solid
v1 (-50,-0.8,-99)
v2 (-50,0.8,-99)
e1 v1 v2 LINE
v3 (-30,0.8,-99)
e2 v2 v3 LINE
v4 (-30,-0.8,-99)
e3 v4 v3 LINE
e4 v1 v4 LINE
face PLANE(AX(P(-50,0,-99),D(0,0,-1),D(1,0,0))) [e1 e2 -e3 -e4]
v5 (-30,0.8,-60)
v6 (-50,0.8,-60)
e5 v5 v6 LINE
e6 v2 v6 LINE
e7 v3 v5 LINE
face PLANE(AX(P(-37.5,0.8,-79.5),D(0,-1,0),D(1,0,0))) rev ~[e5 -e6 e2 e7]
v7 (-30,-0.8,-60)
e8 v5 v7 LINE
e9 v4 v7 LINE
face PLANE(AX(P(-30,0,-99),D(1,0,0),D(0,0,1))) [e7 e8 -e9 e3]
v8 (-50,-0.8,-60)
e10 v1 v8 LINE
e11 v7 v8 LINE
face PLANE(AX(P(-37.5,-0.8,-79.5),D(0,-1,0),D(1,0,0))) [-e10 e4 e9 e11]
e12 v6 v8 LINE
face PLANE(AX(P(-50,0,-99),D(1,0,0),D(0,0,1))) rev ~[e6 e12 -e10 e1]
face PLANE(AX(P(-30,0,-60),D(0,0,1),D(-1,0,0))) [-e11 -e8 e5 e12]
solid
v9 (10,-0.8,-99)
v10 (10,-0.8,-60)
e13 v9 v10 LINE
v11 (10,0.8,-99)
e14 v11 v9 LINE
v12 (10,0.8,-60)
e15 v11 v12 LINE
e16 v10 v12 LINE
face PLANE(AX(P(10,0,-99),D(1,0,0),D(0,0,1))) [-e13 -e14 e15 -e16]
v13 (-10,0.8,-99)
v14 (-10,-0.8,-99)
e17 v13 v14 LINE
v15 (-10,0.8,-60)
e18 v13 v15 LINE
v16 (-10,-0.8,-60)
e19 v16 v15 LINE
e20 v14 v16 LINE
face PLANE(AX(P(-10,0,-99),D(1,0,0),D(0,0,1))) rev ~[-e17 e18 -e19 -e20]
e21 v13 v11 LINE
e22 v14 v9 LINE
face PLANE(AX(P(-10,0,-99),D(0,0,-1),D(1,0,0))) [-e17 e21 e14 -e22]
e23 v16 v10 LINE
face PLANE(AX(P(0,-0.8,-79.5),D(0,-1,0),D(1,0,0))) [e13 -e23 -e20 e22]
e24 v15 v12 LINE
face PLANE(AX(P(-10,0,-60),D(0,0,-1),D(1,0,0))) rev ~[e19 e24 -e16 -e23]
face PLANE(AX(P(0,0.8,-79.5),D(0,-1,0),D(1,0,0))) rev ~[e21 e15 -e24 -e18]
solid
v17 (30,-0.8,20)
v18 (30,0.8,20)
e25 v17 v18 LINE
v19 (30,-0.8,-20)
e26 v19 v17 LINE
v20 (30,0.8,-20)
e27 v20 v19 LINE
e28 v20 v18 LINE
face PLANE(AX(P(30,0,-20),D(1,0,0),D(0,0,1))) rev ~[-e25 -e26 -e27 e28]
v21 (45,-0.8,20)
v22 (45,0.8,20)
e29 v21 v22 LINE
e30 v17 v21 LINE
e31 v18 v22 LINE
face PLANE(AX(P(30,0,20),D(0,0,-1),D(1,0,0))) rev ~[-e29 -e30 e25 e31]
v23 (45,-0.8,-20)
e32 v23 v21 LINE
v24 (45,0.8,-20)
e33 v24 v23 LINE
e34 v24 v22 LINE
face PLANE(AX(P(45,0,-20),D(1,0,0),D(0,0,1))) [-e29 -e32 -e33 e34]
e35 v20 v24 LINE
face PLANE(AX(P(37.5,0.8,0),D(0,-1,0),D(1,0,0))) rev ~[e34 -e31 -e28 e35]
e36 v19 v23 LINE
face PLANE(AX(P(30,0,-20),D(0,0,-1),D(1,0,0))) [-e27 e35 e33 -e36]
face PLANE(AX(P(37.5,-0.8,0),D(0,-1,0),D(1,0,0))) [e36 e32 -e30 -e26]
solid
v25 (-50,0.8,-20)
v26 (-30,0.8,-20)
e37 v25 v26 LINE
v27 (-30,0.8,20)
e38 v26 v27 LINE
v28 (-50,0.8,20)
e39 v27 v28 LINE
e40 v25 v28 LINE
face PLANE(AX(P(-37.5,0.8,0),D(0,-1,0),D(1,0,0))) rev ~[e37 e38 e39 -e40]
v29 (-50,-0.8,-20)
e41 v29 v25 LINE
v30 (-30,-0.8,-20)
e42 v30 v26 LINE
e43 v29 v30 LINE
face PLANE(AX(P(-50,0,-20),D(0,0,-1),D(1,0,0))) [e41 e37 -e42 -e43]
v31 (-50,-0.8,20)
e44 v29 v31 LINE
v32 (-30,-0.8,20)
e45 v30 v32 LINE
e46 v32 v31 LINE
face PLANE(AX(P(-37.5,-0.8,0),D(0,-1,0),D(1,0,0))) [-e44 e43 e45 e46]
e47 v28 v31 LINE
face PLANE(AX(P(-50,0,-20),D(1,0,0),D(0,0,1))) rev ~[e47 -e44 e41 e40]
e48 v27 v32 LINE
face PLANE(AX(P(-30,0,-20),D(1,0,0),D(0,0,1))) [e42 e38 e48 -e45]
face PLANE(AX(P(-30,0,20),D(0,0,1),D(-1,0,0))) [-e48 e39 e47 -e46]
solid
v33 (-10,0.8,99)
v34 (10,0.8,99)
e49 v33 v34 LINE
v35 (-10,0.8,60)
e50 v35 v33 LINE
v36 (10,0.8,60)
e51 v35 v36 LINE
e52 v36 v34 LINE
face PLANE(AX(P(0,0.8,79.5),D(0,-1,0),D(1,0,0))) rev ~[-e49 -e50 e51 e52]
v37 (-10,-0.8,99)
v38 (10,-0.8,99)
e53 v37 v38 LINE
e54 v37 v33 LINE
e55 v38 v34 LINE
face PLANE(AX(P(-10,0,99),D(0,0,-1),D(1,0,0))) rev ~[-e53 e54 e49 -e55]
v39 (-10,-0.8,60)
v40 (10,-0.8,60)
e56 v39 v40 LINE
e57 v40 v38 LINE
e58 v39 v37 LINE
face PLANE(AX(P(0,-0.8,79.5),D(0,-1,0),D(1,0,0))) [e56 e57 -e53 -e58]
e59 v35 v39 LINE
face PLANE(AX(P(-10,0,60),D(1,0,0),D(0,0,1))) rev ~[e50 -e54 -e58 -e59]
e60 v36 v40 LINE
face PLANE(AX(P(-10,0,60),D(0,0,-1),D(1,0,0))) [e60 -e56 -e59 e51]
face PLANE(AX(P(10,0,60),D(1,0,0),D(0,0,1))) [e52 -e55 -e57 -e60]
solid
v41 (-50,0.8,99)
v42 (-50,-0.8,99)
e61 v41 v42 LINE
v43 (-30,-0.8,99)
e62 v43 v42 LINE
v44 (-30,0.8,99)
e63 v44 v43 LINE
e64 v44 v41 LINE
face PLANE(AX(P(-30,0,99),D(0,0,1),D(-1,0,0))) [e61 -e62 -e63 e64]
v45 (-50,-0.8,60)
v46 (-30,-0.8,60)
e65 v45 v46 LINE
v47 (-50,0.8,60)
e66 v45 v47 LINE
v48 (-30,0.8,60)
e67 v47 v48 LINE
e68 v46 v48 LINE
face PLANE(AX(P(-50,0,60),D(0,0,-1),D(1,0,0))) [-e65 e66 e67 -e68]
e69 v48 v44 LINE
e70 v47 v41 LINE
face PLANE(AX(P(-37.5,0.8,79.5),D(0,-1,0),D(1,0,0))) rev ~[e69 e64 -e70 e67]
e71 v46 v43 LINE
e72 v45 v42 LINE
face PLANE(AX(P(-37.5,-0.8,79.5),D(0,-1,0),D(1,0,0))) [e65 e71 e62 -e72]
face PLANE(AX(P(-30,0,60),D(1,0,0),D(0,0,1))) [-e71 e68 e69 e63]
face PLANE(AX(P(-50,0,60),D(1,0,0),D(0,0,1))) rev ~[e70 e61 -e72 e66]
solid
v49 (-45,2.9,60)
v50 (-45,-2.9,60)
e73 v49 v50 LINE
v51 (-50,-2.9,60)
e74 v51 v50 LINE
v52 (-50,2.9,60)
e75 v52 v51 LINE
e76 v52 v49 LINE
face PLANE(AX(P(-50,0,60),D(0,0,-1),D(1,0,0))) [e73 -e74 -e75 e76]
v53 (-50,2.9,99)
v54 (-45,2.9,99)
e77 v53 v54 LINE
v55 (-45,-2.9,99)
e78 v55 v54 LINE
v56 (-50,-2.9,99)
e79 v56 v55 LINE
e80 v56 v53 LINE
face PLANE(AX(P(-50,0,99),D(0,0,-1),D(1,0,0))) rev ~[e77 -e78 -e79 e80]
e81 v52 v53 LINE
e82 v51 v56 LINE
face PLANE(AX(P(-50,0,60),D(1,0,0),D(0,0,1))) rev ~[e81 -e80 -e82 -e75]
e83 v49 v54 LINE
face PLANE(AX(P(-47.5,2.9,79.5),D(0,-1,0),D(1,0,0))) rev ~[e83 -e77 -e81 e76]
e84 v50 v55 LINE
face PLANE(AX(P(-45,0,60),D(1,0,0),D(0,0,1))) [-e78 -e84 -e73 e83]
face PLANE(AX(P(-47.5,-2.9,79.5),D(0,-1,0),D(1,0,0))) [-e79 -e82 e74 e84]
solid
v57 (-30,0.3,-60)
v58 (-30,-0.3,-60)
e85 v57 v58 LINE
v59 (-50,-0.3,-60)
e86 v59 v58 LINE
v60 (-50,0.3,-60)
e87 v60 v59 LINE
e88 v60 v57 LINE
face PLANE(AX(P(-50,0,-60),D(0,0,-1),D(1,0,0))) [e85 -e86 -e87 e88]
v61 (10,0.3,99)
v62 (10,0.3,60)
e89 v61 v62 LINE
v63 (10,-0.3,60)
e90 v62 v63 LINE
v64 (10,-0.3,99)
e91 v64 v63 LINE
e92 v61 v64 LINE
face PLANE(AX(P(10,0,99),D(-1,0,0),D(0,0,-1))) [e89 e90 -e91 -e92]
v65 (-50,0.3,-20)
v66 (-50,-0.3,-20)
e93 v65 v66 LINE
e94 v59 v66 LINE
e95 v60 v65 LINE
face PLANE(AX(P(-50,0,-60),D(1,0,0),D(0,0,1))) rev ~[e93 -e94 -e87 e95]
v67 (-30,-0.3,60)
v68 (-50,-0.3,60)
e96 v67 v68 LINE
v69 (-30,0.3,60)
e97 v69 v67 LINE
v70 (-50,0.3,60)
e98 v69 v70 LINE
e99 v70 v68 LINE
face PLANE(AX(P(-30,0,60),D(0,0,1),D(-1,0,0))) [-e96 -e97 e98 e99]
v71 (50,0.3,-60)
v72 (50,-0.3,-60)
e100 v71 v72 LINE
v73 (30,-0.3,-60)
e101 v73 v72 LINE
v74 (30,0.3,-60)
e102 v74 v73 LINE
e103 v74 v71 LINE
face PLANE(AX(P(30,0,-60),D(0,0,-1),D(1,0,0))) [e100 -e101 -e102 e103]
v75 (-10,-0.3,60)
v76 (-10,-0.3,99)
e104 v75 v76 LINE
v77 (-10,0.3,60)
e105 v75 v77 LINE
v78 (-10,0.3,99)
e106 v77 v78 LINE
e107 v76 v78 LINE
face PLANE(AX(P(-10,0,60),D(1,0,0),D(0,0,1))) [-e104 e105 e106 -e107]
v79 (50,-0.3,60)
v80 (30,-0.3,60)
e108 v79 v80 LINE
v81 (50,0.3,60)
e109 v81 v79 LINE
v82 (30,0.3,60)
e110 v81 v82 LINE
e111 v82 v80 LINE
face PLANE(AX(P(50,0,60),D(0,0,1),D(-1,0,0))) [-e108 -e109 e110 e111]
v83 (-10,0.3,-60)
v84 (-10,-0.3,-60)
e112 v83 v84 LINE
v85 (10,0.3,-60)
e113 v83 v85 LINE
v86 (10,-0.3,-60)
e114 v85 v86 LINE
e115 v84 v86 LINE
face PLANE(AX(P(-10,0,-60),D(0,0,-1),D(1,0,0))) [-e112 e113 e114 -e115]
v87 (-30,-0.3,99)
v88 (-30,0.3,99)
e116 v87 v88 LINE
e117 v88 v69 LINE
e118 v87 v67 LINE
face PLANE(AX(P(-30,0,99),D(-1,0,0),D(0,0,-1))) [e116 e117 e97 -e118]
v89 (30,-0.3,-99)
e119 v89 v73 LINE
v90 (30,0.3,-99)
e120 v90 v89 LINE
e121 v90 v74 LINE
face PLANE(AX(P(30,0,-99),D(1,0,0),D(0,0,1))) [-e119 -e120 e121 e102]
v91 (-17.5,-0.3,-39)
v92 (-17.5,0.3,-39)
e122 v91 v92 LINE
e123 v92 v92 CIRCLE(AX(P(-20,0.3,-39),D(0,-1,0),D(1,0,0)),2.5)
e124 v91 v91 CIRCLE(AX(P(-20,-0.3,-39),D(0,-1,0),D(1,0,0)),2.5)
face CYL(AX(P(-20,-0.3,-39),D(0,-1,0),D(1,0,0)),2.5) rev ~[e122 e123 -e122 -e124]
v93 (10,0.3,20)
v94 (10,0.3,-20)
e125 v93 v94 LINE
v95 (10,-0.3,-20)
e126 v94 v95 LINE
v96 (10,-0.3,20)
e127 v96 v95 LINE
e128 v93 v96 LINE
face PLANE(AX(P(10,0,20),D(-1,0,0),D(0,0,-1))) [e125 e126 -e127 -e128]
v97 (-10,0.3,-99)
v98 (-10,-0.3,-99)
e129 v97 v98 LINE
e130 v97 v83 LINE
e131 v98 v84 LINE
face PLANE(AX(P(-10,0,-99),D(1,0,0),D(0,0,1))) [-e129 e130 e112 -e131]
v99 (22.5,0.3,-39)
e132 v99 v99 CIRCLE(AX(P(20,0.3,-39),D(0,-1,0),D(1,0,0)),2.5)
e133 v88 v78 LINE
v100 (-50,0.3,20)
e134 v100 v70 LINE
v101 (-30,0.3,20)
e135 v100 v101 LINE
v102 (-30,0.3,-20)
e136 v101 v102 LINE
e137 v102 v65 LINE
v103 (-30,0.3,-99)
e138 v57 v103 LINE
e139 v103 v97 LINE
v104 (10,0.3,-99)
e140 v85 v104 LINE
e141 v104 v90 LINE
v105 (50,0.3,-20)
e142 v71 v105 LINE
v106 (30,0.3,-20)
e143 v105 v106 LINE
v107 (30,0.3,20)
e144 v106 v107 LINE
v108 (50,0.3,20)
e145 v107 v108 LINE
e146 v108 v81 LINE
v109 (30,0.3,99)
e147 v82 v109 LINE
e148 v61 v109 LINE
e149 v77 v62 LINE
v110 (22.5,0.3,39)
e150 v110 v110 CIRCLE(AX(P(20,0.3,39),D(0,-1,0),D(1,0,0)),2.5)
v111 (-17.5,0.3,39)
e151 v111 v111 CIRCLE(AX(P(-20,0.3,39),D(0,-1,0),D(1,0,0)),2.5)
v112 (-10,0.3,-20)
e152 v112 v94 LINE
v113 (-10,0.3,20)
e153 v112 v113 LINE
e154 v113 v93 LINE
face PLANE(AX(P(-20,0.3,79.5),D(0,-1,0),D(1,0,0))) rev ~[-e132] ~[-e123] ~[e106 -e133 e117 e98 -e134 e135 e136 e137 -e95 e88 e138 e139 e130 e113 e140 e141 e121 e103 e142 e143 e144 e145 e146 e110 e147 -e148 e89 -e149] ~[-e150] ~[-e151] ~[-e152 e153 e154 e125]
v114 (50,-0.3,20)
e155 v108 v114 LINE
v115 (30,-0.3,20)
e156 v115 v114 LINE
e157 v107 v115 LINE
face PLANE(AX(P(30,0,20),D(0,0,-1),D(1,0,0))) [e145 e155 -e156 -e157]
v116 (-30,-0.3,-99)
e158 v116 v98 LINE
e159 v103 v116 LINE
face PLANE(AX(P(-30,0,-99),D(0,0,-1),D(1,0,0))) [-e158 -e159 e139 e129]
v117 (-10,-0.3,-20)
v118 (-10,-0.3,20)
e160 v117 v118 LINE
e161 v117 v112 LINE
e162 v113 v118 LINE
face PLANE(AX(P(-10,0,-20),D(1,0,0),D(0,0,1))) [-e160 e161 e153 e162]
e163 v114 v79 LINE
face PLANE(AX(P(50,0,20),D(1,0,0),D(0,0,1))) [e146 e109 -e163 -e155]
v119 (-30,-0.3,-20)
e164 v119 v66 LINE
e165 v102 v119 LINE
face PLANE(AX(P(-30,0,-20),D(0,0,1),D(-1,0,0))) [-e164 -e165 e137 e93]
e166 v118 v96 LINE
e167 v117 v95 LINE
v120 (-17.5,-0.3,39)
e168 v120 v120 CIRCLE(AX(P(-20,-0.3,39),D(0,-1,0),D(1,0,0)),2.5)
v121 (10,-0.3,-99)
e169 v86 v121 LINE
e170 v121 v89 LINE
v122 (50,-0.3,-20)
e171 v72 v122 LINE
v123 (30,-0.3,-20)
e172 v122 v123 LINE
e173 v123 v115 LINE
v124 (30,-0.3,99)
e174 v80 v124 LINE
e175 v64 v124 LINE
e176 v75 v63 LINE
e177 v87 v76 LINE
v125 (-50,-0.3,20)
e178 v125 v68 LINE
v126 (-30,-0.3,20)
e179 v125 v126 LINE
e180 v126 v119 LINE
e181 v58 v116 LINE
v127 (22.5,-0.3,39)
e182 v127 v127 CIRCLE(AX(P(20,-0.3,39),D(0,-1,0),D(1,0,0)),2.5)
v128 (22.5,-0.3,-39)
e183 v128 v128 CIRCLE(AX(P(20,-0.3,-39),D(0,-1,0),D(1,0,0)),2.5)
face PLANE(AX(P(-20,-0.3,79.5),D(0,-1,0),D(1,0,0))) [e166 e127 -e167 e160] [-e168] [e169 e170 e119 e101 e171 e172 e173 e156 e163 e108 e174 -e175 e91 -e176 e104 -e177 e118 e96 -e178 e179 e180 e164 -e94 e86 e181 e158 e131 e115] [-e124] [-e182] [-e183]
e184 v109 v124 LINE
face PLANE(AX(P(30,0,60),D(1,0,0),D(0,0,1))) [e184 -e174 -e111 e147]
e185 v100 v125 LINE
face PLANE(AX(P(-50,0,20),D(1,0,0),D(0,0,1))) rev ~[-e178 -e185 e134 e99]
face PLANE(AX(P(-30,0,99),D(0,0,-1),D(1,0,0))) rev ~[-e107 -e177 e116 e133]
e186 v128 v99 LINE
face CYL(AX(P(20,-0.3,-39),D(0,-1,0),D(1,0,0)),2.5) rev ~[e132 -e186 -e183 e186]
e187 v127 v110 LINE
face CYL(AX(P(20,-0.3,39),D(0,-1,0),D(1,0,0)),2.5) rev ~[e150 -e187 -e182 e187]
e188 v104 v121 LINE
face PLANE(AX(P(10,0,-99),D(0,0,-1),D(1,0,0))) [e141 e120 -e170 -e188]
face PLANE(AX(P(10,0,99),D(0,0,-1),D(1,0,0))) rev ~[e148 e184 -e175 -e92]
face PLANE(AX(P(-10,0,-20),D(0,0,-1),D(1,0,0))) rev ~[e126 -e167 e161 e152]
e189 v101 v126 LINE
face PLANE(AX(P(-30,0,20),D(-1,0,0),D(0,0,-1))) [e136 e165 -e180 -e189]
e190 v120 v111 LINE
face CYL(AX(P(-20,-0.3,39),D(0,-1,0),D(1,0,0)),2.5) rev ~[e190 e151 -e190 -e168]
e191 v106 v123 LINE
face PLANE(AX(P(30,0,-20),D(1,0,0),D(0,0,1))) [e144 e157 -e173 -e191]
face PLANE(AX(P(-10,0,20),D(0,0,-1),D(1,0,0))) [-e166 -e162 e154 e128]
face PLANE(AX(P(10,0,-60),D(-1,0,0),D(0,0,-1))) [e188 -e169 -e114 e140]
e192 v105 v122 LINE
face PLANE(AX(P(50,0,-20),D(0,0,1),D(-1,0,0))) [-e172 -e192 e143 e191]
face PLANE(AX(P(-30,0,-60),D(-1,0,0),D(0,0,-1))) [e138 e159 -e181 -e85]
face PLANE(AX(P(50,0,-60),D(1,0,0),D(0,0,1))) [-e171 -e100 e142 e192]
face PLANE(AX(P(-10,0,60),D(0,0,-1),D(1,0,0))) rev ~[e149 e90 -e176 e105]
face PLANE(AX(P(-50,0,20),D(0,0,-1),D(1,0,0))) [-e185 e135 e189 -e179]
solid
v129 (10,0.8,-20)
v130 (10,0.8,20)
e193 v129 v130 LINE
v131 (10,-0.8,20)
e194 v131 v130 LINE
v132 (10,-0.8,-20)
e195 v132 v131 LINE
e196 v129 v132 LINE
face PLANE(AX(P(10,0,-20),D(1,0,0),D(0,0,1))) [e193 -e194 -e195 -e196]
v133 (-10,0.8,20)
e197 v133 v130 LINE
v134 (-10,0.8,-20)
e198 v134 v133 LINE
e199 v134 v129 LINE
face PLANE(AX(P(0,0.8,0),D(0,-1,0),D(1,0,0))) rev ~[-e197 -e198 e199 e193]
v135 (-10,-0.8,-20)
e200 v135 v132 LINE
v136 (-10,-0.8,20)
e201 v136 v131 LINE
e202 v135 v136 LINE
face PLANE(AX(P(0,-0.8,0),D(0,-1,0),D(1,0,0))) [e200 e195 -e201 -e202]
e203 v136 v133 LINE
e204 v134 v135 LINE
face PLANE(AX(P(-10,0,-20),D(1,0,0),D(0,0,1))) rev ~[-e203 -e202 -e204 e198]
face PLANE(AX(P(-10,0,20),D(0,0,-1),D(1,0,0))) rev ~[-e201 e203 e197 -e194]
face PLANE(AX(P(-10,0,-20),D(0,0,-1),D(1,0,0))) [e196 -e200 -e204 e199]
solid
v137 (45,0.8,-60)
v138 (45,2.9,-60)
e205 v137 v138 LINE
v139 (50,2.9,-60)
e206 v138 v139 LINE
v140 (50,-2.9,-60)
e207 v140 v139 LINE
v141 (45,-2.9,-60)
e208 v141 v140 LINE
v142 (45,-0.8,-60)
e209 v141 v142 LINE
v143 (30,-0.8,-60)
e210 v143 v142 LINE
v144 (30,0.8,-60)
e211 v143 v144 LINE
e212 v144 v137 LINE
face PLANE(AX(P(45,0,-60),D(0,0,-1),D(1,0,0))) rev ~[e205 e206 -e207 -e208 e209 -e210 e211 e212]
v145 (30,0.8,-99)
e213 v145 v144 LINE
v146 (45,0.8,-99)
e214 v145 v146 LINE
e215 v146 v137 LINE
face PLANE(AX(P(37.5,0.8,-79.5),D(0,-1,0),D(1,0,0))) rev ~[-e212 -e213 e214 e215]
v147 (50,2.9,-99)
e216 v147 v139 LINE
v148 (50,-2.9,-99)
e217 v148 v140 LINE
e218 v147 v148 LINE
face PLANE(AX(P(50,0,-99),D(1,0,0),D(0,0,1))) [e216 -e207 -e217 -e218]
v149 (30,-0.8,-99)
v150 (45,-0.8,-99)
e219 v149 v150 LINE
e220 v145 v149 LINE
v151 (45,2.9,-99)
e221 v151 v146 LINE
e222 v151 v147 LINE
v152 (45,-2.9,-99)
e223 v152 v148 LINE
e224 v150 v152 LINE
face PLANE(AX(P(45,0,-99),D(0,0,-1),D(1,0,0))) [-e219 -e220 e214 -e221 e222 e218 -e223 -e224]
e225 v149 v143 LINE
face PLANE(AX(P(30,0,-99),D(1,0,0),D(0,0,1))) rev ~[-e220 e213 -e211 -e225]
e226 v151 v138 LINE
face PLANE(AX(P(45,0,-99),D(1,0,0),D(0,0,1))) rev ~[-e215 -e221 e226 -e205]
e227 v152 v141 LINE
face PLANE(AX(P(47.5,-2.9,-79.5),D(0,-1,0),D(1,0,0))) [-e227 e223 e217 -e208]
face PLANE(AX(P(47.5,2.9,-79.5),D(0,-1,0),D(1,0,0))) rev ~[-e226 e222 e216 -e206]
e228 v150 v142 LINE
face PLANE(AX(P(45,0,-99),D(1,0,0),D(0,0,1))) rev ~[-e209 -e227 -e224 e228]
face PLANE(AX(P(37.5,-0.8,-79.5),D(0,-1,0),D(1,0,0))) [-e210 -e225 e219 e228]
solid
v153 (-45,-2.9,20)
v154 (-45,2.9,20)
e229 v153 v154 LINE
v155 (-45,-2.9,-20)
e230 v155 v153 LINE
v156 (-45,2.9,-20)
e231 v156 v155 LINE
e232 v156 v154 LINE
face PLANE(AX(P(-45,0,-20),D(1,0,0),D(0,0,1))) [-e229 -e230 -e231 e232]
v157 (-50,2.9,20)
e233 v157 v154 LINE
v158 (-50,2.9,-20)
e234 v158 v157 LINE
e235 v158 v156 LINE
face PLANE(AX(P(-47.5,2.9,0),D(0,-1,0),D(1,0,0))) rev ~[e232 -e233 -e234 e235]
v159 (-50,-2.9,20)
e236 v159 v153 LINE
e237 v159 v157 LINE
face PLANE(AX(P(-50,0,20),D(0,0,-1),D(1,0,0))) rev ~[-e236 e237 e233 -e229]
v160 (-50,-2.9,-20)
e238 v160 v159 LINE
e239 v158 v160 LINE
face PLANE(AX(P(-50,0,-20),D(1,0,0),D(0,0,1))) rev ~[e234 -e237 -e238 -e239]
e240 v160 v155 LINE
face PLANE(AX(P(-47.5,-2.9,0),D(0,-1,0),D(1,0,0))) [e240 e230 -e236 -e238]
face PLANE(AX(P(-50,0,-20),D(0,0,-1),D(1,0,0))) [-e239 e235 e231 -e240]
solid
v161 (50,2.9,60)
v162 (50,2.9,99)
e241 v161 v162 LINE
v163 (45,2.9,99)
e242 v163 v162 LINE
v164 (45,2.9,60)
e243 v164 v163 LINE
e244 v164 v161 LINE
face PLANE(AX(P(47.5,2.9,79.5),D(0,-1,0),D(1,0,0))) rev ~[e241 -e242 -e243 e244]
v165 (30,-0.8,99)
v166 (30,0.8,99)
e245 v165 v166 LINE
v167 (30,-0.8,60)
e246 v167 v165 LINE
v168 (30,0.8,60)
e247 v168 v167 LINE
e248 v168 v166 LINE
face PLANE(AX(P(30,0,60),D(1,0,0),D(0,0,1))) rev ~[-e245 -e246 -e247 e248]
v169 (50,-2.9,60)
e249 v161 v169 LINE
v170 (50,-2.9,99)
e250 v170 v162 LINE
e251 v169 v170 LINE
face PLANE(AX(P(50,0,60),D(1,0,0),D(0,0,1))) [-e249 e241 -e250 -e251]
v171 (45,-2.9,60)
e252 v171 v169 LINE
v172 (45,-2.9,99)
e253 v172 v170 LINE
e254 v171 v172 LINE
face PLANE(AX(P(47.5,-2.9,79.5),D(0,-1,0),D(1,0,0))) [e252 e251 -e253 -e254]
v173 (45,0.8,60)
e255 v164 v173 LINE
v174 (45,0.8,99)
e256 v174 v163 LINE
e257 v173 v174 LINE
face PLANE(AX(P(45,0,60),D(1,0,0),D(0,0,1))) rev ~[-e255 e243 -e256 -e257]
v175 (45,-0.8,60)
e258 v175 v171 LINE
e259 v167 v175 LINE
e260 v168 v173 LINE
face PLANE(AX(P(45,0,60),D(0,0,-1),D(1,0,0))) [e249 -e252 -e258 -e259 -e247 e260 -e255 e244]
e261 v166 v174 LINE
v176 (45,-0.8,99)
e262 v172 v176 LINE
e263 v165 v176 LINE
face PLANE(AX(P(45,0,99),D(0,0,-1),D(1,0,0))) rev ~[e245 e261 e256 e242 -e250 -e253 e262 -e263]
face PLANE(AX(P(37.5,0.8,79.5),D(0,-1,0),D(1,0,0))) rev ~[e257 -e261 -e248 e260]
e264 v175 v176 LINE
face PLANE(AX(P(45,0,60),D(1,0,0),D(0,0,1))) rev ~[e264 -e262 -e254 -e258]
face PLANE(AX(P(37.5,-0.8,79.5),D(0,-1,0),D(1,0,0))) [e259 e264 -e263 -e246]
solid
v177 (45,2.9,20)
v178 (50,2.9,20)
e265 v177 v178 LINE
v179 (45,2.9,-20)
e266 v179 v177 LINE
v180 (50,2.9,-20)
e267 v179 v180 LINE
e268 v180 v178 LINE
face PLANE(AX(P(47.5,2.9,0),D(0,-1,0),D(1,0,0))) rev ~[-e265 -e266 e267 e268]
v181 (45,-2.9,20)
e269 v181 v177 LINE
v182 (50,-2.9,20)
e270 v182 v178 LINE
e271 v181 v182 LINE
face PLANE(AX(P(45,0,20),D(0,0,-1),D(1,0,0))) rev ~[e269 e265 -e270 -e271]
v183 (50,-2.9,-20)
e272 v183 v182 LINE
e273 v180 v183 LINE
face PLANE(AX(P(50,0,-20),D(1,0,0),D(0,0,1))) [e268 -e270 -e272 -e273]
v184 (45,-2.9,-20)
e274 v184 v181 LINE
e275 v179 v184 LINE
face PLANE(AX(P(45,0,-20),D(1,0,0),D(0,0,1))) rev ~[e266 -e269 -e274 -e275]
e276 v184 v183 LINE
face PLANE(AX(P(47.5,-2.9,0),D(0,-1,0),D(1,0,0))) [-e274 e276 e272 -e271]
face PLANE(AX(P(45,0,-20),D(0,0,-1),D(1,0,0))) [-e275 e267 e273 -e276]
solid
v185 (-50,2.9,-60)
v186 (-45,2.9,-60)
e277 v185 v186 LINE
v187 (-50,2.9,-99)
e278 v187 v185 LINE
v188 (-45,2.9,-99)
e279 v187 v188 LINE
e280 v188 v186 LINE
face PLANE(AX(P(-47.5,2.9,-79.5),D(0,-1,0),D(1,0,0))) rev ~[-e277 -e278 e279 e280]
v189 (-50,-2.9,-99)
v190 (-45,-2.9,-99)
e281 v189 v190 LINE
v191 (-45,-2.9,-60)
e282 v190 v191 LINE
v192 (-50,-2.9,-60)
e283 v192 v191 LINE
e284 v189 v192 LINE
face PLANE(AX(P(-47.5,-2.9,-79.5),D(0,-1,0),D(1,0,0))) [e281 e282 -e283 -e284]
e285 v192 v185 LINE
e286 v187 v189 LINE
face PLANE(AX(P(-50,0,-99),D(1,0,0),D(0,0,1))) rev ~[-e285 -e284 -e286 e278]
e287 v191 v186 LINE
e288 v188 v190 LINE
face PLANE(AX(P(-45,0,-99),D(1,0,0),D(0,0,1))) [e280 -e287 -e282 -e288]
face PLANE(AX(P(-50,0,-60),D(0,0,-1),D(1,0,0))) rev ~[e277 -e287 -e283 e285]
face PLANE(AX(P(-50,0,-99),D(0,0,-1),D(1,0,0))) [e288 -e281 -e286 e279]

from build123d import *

# Parameters (mm, degrees)
F0_W     = 5
F0_H     = 39
F1_DEPTH = 2.9
F0_H_2   = 40
F0_W_2   = 15
F2_DEPTH = 0.8
F0_W_3   = 20
F3_DEPTH = 0.3
F4_R     = 2.5
F5_DEPTH = 3.201


with BuildPart() as f1:
    # F0 (on Front) → F1 (new body, symmetric)
    with BuildSketch(Plane.XZ):
        with Locations((-47.5, -79.5)):
            Rectangle(F0_W, F0_H)
    extrude(amount=F1_DEPTH, both=True)


with BuildPart() as f1b:
    # F0 (on Front) → F1, piece 2 (new body, symmetric)
    with BuildSketch(Plane.XZ):
        with Locations((-47.5, 79.5)):
            Rectangle(F0_W, F0_H)
    extrude(amount=F1_DEPTH, both=True)


with BuildPart() as f1c:
    # F0 (on Front) → F1, piece 3 (new body, symmetric)
    with BuildSketch(Plane.XZ):
        with Locations((-47.5, 0)):
            Rectangle(F0_W, F0_H_2)
    extrude(amount=F1_DEPTH, both=True)


with BuildPart() as f1d:
    # F0 (on Front) → F1, piece 4 (new body, symmetric)
    with BuildSketch(Plane.XZ):
        with Locations((47.5, -79.5)):
            Rectangle(F0_W, F0_H)
    extrude(amount=F1_DEPTH, both=True)

    # F0 (on Front) → F2, piece 4 (join, symmetric)
    with BuildSketch(Plane.XZ):
        with Locations((37.5, -79.5)):
            Rectangle(F0_W_2, F0_H)
    extrude(amount=F2_DEPTH, both=True)


with BuildPart() as f1e:
    # F0 (on Front) → F1, piece 5 (new body, symmetric)
    with BuildSketch(Plane.XZ):
        with Locations((47.5, 79.5)):
            Rectangle(F0_W, F0_H)
    extrude(amount=F1_DEPTH, both=True)

    # F0 (on Front) → F2, piece 5 (join, symmetric)
    with BuildSketch(Plane.XZ):
        with Locations((37.5, 79.5)):
            Rectangle(F0_W_2, F0_H)
    extrude(amount=F2_DEPTH, both=True)


with BuildPart() as f1f:
    # F0 (on Front) → F1, piece 6 (new body, symmetric)
    with BuildSketch(Plane.XZ):
        with Locations((47.5, 0)):
            Rectangle(F0_W, F0_H_2)
    extrude(amount=F1_DEPTH, both=True)


with BuildPart() as f2:
    # F0 (on Front) → F2 (new body, symmetric)
    with BuildSketch(Plane.XZ):
        with Locations((-37.5, -79.5)):
            Rectangle(F0_W_2, F0_H)
        with Locations((-47.5, -79.5)):
            Rectangle(F0_W, F0_H)
    extrude(amount=F2_DEPTH, both=True)


with BuildPart() as f2b:
    # F0 (on Front) → F2, piece 2 (new body, symmetric)
    with BuildSketch(Plane.XZ):
        with Locations((-37.5, 79.5)):
            Rectangle(F0_W_2, F0_H)
        with Locations((-47.5, 79.5)):
            Rectangle(F0_W, F0_H)
    extrude(amount=F2_DEPTH, both=True)


with BuildPart() as f2c:
    # F0 (on Front) → F2, piece 3 (new body, symmetric)
    with BuildSketch(Plane.XZ):
        with Locations((-37.5, 0)):
            Rectangle(F0_W_2, F0_H_2)
        with Locations((-47.5, 0)):
            Rectangle(F0_W, F0_H_2)
    extrude(amount=F2_DEPTH, both=True)


with BuildPart() as f2d:
    # F0 (on Front) → F2, piece 6 (new body, symmetric)
    with BuildSketch(Plane.XZ):
        with Locations((37.5, 0)):
            Rectangle(F0_W_2, F0_H_2)
    extrude(amount=F2_DEPTH, both=True)


with BuildPart() as f2e:
    # F0 (on Front) → F2, piece 7 (new body, symmetric)
    with BuildSketch(Plane.XZ):
        with Locations((0, -79.5)):
            Rectangle(F0_W_3, F0_H)
    extrude(amount=F2_DEPTH, both=True)


with BuildPart() as f2f:
    # F0 (on Front) → F2, piece 8 (new body, symmetric)
    with BuildSketch(Plane.XZ):
        with Locations((0, 79.5)):
            Rectangle(F0_W_3, F0_H)
    extrude(amount=F2_DEPTH, both=True)


with BuildPart() as f2g:
    # F0 (on Front) → F2, piece 9 (new body, symmetric)
    with BuildSketch(Plane.XZ):
        Rectangle(F0_W_3, F0_H_2)
    extrude(amount=F2_DEPTH, both=True)


with BuildPart() as f3:
    # F0 (on Front) → F3 (new body, symmetric)
    with BuildSketch(Plane.XZ):
        with Locations((-20, 79.5)):
            Rectangle(F0_W_3, F0_H)
        with Locations((-20, 40)):
            Rectangle(F0_W_3, F0_H_2)
        with Locations((-20, 0)):
            Rectangle(F0_W_3, F0_H_2)
        with Locations((-20, -40)):
            Rectangle(F0_W_3, F0_H_2)
        with Locations((-20, -79.5)):
            Rectangle(F0_W_3, F0_H)
        with Locations((20, 79.5)):
            Rectangle(F0_W_3, F0_H)
        with Locations((20, 40)):
            Rectangle(F0_W_3, F0_H_2)
        with Locations((20, 0)):
            Rectangle(F0_W_3, F0_H_2)
        with Locations((20, -40)):
            Rectangle(F0_W_3, F0_H_2)
        with Locations((20, -79.5)):
            Rectangle(F0_W_3, F0_H)
        with Locations((-47.5, 40)):
            Rectangle(F0_W, F0_H_2)
        with Locations((-37.5, 40)):
            Rectangle(F0_W_2, F0_H_2)
        with Locations((0, 40)):
            Rectangle(F0_W_3, F0_H_2)
        with Locations((37.5, 40)):
            Rectangle(F0_W_2, F0_H_2)
        with Locations((47.5, 40)):
            Rectangle(F0_W, F0_H_2)
        with Locations((47.5, -40)):
            Rectangle(F0_W, F0_H_2)
        with Locations((37.5, -40)):
            Rectangle(F0_W_2, F0_H_2)
        with Locations((0, -40)):
            Rectangle(F0_W_3, F0_H_2)
        with Locations((-37.5, -40)):
            Rectangle(F0_W_2, F0_H_2)
        with Locations((-47.5, -40)):
            Rectangle(F0_W, F0_H_2)
    extrude(amount=F3_DEPTH, both=True)

    # F4 (on face) → F5 (cut, through all)
    with BuildSketch(Plane.XZ.offset(0.3)):
        with Locations((-20, 39)):
            Circle(F4_R)
        with Locations((20, 39)):
            Circle(F4_R)
        with Locations((-20, -39)):
            Circle(F4_R)
        with Locations((20, -39)):
            Circle(F4_R)
    extrude(amount=-F5_DEPTH, mode=Mode.SUBTRACT)


solid = Compound([f1.part, f1b.part, f1c.part, f1d.part, f1e.part, f1f.part, f2.part, f2b.part, f2c.part, f2d.part, f2e.part, f2f.part, f2g.part, f3.part])
